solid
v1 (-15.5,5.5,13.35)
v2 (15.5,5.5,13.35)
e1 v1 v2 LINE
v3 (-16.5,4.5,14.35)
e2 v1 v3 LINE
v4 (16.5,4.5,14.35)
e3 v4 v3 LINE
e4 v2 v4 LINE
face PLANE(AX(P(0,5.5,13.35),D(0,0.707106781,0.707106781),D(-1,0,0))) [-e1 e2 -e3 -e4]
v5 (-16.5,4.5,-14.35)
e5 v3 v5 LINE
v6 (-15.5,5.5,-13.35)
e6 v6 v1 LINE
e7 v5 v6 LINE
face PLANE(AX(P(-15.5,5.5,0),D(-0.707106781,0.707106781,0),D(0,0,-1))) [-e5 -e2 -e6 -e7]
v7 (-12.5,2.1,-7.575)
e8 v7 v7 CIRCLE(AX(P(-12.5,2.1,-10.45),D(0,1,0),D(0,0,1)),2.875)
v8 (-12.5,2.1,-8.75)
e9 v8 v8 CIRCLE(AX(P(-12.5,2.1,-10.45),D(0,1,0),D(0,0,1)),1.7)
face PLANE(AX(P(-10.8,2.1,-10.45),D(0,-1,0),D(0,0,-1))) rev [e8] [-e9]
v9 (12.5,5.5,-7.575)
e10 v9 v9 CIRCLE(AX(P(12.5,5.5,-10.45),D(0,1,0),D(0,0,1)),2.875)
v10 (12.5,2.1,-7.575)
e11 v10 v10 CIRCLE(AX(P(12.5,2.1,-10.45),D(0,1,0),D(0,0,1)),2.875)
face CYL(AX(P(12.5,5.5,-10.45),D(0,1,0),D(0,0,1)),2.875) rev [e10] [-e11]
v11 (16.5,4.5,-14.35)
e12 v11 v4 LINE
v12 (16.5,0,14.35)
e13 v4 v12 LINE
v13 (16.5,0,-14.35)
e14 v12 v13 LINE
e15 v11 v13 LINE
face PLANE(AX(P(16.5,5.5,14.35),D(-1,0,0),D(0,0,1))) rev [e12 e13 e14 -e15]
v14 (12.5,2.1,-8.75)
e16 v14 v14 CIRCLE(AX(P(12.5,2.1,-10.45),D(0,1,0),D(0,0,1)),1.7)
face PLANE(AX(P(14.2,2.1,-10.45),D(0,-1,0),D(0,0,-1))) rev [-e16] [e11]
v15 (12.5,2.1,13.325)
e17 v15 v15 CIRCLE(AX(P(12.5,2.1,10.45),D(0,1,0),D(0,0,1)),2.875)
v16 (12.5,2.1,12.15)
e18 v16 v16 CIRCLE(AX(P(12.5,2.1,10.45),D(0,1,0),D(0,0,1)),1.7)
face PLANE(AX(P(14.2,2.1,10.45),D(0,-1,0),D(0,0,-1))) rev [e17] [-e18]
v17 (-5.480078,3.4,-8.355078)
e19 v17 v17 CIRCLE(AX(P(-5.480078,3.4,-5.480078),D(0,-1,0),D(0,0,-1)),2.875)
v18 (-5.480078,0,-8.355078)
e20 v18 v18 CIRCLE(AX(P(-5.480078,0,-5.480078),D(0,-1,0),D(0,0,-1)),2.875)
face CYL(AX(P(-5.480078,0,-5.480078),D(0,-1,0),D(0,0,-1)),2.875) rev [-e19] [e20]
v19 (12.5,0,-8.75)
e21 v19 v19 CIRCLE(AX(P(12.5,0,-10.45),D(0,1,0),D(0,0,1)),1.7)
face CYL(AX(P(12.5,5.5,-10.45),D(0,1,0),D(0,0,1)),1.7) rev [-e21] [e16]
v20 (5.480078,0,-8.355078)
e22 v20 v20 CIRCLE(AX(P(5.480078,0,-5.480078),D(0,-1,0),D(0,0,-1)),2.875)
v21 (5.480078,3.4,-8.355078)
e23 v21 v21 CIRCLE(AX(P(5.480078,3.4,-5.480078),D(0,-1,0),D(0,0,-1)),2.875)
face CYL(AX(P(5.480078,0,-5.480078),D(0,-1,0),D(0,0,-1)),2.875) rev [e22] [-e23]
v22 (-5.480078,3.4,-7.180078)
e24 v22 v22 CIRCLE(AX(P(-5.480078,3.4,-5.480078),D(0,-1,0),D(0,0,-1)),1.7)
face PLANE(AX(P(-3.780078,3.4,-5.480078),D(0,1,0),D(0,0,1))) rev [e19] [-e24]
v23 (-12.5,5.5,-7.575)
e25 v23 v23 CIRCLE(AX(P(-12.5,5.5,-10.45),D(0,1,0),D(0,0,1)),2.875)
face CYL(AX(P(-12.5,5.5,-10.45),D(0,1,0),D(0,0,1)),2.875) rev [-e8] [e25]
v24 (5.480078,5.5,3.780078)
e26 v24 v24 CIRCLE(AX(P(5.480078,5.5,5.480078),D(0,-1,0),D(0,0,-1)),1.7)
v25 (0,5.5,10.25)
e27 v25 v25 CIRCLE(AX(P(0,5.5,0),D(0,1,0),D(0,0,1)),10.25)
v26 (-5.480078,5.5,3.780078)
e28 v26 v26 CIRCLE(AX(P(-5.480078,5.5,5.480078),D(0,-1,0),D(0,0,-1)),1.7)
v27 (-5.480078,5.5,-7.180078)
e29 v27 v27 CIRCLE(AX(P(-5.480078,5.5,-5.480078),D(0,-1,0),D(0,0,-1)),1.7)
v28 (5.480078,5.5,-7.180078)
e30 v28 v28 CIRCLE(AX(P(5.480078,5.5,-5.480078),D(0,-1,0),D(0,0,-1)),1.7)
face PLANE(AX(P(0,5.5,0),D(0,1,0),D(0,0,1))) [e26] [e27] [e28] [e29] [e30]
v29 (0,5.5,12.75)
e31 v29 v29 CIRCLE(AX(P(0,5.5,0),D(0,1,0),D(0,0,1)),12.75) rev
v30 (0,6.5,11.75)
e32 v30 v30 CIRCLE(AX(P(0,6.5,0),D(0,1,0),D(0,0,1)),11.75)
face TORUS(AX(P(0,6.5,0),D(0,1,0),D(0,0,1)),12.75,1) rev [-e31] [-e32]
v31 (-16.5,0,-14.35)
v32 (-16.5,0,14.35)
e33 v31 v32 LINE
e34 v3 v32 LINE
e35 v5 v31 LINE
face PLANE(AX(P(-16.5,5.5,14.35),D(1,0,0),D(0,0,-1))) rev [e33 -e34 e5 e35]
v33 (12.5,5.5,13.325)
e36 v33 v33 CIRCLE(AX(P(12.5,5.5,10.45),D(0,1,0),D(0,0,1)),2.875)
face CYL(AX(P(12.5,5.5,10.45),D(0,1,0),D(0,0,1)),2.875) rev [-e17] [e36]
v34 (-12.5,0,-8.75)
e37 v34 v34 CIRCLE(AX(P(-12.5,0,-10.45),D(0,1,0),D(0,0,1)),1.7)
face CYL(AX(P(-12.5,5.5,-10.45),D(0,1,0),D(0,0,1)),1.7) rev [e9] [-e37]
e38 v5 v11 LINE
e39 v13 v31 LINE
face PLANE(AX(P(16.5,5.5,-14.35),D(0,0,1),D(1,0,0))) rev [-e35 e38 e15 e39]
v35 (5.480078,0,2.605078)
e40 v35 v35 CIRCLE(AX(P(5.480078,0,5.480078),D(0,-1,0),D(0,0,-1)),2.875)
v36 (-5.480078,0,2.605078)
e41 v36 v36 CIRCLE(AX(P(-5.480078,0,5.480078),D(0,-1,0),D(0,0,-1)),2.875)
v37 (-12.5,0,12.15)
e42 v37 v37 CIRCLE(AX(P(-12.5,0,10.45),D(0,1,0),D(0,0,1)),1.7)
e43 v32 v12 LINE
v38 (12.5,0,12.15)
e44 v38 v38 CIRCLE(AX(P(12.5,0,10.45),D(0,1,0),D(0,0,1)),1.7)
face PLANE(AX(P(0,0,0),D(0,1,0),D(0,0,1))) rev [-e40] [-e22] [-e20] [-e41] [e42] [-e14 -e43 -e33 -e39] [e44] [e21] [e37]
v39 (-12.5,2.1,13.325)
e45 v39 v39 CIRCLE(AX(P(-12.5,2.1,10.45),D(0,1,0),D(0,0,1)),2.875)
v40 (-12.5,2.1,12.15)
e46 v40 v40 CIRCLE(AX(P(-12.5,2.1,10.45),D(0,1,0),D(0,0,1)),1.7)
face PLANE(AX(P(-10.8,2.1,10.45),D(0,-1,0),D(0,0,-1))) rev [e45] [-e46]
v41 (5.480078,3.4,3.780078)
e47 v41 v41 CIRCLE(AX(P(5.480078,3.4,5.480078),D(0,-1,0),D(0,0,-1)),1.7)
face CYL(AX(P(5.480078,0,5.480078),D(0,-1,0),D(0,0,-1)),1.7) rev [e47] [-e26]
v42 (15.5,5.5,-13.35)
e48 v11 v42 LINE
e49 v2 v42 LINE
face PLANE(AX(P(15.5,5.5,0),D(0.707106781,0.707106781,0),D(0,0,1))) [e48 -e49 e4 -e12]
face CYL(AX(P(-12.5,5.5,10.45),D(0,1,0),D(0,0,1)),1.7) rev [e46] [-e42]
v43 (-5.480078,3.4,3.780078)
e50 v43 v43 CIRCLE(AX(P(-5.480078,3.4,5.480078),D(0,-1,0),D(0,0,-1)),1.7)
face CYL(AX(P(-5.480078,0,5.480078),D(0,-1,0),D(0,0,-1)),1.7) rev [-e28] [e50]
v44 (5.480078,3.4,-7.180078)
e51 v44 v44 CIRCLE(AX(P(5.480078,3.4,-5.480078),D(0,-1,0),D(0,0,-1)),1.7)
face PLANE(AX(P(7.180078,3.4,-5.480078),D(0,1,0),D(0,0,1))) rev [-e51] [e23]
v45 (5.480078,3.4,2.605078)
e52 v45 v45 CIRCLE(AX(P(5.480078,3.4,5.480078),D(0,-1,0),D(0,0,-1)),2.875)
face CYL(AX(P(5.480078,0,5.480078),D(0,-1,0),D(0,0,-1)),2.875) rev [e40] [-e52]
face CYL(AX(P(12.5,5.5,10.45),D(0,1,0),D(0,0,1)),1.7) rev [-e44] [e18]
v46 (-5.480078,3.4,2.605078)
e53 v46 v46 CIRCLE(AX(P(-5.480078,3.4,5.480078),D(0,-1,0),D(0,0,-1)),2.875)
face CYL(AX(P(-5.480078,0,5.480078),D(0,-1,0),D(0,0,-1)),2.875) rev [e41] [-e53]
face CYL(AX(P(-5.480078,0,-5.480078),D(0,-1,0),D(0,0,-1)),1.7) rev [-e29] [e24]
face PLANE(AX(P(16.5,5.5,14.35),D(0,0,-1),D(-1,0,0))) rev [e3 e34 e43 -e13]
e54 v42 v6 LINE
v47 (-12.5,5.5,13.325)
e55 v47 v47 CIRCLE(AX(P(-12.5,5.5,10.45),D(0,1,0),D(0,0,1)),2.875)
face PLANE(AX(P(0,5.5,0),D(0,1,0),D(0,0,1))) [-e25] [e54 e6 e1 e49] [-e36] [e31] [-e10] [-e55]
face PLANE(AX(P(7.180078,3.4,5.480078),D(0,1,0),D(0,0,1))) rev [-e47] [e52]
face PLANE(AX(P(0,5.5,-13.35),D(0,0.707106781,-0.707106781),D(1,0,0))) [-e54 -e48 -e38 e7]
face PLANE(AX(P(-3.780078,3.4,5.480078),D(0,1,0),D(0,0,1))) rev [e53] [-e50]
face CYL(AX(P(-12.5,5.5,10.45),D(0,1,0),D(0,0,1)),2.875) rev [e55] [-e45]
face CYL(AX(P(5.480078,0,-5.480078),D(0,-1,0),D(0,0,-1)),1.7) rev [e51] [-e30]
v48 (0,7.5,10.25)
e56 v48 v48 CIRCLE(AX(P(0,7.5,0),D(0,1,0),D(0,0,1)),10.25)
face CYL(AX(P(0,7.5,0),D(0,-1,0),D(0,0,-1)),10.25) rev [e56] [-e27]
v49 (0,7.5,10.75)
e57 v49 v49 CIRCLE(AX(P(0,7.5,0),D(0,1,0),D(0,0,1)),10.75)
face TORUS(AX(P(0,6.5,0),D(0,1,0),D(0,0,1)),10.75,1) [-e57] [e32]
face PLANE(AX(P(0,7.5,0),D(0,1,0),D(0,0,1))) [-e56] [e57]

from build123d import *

# Parameters (mm, degrees)
SKETCH1_W                      = 33
SKETCH1_H                      = 28.7
BOSS_EXTRUDE1_DEPTH            = 5.5
CBORE_FOR_M3_SHCS1_D           = 3.4
CBORE_FOR_M3_SHCS1_CBORE_D     = 5.75
CBORE_FOR_M3_SHCS1_CBORE_DEPTH = 3.4
CBORE_FOR_M3_SHCS2_D           = 3.4
CBORE_FOR_M3_SHCS2_CBORE_D     = 5.75
CBORE_FOR_M3_SHCS2_CBORE_DEPTH = 3.4
SKETCH9_R                      = 11.75
SKETCH9_R_2                    = 10.25
BOSS_EXTRUDE2_DEPTH            = 2
FILLET1_R                      = 1
CHAMFER1_SIZE                  = 1


with BuildPart() as part:
    # Sketch1 → Boss-Extrude1 (new body)
    with BuildSketch(Plane(origin=(0, 0, 0), x_dir=(1, 0, 0), z_dir=(0, 1, 0))):
        Rectangle(SKETCH1_W, SKETCH1_H)
    extrude(amount=BOSS_EXTRUDE1_DEPTH)

    # CBORE for M3 SHCS1 (through all)
    with Locations(Plane(origin=(0, 5.5, 0), x_dir=(1, 0, 0), z_dir=(0, 1, 0))):
        with Locations((-12.5, 10.45), (12.5, 10.45), (12.5, -10.45), (-12.5, -10.45)):
            CounterBoreHole(CBORE_FOR_M3_SHCS1_D / 2, CBORE_FOR_M3_SHCS1_CBORE_D / 2, CBORE_FOR_M3_SHCS1_CBORE_DEPTH)

    # CBORE for M3 SHCS2 (through all)
    with Locations(Plane(origin=(0, 0, 0), x_dir=(-1, 0, 0), z_dir=(0, -1, 0))):
        with Locations((-5.480077554, -5.480077554), (5.480077554, -5.480077554), (5.480077554, 5.480077554), (-5.480077554, 5.480077554)):
            CounterBoreHole(CBORE_FOR_M3_SHCS2_D / 2, CBORE_FOR_M3_SHCS2_CBORE_D / 2, CBORE_FOR_M3_SHCS2_CBORE_DEPTH)

    # Sketch9 → Boss-Extrude2 (add)
    with BuildSketch(Plane(origin=(0, 5.5, 0), x_dir=(1, 0, 0), z_dir=(0, 1, 0))):
        with Locations(Location((0, 0, 0), (0, 0, 270))):
            Circle(SKETCH9_R)
        with Locations(Location((0, 0, 0), (0, 0, 270))):
            Circle(SKETCH9_R_2, mode=Mode.SUBTRACT)
    extrude(amount=BOSS_EXTRUDE2_DEPTH)

    # Fillet1
    fillet1_edges = [part.edges().sort_by_distance(p)[0] for p in [
        (0, 5.5, -11.75),
        (0, 7.5, -11.75),
    ]]
    fillet(fillet1_edges, radius=FILLET1_R - 0.0001)  # a hair under: the kernel refuses the full size

    # Chamfer1
    chamfer1_edges = [part.edges().sort_by_distance(p)[0] for p in [
        (16.5, 5.5, 0),
        (0, 5.5, -14.35),
        (-16.5, 5.5, 0),
        (0, 5.5, 14.35),
    ]]
    chamfer(chamfer1_edges, length=CHAMFER1_SIZE)


solid = part.part
